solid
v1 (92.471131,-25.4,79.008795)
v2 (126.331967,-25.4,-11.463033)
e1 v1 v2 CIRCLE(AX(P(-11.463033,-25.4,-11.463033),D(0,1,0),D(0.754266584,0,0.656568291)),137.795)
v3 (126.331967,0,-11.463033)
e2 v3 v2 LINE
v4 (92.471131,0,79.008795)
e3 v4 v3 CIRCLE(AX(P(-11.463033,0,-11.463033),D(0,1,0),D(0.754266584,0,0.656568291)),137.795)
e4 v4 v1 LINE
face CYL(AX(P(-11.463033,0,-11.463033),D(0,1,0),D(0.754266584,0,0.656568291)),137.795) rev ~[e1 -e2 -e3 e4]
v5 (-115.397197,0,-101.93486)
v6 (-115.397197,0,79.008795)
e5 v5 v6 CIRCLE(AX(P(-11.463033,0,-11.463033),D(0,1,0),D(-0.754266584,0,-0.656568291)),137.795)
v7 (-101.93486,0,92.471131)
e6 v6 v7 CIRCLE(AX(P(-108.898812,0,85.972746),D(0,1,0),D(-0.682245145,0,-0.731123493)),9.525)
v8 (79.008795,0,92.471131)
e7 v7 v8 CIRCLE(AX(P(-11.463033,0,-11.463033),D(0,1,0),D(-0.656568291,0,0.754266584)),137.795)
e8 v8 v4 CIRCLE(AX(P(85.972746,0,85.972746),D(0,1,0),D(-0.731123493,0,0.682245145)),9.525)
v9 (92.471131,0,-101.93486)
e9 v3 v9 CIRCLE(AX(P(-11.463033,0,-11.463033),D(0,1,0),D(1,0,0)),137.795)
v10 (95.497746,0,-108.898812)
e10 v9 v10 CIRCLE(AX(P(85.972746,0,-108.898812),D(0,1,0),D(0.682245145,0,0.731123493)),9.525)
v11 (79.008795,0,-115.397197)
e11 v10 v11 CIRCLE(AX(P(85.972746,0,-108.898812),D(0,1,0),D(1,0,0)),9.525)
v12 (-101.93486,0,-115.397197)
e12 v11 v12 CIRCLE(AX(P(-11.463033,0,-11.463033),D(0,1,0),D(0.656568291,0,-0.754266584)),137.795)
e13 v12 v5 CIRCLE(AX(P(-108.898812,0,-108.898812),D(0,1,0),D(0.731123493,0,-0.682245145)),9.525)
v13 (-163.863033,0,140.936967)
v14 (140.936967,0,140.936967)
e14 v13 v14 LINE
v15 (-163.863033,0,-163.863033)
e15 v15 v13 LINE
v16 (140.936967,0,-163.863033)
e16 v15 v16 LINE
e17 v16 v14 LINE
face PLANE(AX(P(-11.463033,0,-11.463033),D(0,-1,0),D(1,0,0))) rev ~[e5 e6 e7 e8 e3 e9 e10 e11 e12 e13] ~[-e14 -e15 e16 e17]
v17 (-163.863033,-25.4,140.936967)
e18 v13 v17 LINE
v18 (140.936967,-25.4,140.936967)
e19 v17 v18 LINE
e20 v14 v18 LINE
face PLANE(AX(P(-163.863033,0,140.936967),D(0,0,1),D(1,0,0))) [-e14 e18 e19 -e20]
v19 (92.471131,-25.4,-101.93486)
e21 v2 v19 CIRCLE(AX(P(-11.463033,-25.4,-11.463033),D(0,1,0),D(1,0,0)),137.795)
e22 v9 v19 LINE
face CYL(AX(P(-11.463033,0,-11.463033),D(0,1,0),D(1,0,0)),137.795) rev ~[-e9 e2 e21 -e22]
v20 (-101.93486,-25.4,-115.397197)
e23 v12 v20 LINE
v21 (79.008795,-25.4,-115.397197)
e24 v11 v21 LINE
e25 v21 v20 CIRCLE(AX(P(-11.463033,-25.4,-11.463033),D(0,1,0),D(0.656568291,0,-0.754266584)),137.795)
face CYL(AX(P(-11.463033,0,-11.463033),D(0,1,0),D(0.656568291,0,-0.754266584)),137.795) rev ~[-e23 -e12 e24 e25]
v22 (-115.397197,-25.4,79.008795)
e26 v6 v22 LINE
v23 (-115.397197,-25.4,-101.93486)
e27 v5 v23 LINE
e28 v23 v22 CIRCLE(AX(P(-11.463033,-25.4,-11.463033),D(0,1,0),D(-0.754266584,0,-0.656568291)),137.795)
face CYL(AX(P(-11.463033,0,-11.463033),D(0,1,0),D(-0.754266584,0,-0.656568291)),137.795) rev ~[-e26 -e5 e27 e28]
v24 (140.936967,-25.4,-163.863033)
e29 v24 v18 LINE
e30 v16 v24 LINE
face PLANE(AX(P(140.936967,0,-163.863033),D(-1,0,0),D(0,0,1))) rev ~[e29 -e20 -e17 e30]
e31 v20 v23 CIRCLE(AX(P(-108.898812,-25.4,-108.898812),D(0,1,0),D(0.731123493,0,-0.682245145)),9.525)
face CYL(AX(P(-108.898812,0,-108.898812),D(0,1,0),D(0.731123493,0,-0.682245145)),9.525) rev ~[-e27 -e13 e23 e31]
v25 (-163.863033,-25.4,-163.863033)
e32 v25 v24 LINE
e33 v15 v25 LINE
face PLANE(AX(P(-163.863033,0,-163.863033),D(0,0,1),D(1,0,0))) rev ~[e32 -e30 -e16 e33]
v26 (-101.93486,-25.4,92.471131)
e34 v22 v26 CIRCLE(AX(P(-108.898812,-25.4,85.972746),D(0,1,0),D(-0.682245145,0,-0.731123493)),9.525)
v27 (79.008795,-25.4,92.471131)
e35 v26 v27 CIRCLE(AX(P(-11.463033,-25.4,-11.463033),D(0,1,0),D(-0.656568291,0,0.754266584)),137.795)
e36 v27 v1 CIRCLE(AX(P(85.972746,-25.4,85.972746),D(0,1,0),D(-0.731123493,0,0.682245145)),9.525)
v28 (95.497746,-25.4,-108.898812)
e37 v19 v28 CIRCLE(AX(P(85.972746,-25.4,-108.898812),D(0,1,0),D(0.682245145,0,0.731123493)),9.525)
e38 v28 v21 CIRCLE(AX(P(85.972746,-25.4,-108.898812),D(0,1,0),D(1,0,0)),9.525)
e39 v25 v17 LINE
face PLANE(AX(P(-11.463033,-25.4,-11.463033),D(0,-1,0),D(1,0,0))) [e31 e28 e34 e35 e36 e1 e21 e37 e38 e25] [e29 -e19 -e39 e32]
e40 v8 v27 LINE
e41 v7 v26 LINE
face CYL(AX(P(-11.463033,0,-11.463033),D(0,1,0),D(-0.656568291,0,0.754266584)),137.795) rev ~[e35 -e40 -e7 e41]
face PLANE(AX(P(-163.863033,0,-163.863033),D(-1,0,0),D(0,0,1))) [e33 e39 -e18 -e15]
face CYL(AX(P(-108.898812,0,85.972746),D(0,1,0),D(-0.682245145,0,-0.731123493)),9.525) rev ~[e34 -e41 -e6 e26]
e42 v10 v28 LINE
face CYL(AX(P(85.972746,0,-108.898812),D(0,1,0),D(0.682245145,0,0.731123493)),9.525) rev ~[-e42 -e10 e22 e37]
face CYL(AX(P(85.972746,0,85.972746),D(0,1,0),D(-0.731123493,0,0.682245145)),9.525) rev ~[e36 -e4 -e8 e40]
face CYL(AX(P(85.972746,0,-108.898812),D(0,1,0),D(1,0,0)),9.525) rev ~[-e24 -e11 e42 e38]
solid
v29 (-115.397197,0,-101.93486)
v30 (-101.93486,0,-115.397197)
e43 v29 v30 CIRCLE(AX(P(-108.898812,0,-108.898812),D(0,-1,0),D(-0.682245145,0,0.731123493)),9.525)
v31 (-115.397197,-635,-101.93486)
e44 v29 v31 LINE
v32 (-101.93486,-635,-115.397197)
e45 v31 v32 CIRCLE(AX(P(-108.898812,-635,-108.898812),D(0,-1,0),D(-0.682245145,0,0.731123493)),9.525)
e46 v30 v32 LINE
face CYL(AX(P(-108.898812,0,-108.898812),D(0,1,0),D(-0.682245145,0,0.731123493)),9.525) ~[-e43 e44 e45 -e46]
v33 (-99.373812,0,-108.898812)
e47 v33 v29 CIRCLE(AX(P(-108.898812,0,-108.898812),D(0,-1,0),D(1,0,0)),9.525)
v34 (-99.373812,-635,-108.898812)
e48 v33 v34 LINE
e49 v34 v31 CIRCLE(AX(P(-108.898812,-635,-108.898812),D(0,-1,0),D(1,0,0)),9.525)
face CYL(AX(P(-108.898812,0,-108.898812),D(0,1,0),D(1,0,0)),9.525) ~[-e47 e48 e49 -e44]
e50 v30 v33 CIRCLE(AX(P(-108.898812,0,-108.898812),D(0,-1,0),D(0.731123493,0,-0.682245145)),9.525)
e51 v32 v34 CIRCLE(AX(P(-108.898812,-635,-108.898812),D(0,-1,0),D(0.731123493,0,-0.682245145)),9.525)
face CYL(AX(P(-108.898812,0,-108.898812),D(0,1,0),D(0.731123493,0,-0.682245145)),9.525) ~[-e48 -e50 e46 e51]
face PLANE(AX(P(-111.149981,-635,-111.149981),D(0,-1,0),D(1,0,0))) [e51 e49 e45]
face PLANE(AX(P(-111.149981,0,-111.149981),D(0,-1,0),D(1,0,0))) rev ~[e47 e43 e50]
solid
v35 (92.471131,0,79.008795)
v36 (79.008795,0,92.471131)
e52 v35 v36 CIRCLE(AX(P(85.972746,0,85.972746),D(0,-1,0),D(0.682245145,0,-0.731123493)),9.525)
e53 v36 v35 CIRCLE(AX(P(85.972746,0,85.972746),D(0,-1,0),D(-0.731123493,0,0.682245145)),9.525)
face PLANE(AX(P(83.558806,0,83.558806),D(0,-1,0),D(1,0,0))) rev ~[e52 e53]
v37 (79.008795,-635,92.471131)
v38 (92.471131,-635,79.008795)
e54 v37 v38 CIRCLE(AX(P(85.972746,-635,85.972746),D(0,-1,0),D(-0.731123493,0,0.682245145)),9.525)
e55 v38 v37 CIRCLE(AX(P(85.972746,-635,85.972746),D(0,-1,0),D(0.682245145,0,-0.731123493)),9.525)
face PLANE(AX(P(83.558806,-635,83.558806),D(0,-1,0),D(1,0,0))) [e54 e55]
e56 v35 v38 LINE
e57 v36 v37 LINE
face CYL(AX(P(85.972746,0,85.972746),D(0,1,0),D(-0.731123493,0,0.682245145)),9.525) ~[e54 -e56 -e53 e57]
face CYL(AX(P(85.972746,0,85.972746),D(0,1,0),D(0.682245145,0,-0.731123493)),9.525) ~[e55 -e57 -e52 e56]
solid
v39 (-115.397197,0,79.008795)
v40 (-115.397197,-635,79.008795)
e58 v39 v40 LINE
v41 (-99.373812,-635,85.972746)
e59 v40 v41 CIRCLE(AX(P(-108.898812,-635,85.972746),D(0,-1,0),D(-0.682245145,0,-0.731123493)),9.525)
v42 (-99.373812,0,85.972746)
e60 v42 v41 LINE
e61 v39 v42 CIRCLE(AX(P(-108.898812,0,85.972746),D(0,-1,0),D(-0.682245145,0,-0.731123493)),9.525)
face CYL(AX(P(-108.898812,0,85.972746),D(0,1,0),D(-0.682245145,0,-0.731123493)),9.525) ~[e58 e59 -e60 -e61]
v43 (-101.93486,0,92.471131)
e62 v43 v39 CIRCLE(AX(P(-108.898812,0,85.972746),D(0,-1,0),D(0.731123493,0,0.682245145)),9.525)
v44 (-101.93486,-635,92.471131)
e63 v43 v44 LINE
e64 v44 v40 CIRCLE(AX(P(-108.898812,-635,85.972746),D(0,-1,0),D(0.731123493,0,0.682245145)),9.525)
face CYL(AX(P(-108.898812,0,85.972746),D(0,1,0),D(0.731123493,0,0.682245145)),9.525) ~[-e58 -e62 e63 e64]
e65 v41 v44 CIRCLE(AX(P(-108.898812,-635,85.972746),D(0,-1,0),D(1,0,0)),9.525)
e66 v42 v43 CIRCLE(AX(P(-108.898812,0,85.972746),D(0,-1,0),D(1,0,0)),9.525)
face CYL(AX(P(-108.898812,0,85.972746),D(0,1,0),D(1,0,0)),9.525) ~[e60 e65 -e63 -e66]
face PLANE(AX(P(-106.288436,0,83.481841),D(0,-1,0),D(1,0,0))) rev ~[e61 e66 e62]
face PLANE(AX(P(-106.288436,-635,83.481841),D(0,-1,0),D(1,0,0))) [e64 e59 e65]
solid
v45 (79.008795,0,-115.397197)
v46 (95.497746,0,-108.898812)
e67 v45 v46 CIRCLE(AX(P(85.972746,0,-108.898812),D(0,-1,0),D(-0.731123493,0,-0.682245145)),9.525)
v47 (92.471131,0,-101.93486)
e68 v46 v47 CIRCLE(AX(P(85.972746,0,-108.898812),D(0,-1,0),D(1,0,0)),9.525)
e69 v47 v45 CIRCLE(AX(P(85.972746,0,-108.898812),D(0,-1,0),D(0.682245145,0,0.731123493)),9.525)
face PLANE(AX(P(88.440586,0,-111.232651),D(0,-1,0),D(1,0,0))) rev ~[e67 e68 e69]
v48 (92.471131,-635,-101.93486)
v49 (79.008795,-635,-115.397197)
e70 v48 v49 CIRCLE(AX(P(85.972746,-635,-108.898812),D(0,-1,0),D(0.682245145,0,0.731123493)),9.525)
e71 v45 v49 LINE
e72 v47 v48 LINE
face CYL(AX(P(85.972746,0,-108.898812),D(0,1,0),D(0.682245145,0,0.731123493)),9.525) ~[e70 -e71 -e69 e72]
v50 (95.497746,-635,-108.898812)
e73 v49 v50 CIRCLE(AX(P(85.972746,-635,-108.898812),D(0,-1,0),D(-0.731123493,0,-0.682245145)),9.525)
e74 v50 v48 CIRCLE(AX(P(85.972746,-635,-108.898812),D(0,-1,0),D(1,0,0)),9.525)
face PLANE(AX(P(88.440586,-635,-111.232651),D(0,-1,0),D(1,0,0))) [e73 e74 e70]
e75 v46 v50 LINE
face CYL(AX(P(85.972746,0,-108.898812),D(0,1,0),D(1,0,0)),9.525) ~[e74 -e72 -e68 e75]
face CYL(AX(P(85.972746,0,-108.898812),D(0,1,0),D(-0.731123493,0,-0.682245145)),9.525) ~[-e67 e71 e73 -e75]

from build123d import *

# Parameters (mm, degrees)
F1_DEPTH = 635
F0_W     = 304.8
F0_H     = 304.8
F2_DEPTH = 25.4


with BuildPart() as f1:
    # F0 (on Front) → F1 (new body)
    with BuildSketch(Plane.XZ):
        with BuildLine():
            ThreePointArc((79.0087948248, 92.4711311021), (79.2375540094, 79.2375540094), (92.4711311021, 79.0087948248))
            ThreePointArc((92.4711311021, 79.0087948248), (85.9727461002, 85.9727461002), (79.0087948248, 92.4711311021))
        make_face()
        with BuildLine():
            ThreePointArc((79.0087948248, 92.4711311021), (85.9727461002, 85.9727461002), (92.4711311021, 79.0087948248))
            ThreePointArc((92.4711311021, 79.0087948248), (94.708384089, 82.1761352526), (95.4977461002, 85.9727461002))
            ThreePointArc((95.4977461002, 85.9727461002), (89.4651656842, 94.834384236), (79.0087948248, 92.4711311021))
        make_face()
    extrude(amount=F1_DEPTH)


with BuildPart() as f1b:
    # F0 (on Front) → F1, piece 2 (new body)
    with BuildSketch(Plane.XZ):
        with BuildLine():
            ThreePointArc((95.4977461002, -108.898811727), (94.708384089, -105.1022008793), (92.4711311021, -101.9348604515))
            ThreePointArc((92.4711311021, -101.9348604515), (85.9727461002, -108.898811727), (79.0087948248, -115.3971967289))
            ThreePointArc((79.0087948248, -115.3971967289), (89.4651656842, -117.7604498627), (95.4977461002, -108.898811727))
        make_face()
        with BuildLine():
            ThreePointArc((79.0087948248, -115.3971967289), (85.9727461002, -108.898811727), (92.4711311021, -101.9348604515))
            ThreePointArc((92.4711311021, -101.9348604515), (79.2375540094, -102.1636196362), (79.0087948248, -115.3971967289))
        make_face()
    extrude(amount=F1_DEPTH)


with BuildPart() as f1c:
    # F0 (on Front) → F1, piece 3 (new body)
    with BuildSketch(Plane.XZ):
        with BuildLine():
            ThreePointArc((-99.373811727, 85.9727461002), (-100.0371735912, 89.4651656842), (-101.9348604515, 92.4711311021))
            ThreePointArc((-101.9348604515, 92.4711311021), (-108.898811727, 85.9727461002), (-115.3971967289, 79.0087948248))
            ThreePointArc((-115.3971967289, 79.0087948248), (-105.1022008793, 77.2371081114), (-99.373811727, 85.9727461002))
        make_face()
        with BuildLine():
            ThreePointArc((-115.3971967289, 79.0087948248), (-108.898811727, 85.9727461002), (-101.9348604515, 92.4711311021))
            ThreePointArc((-101.9348604515, 92.4711311021), (-115.6340038178, 92.707938191), (-115.3971967289, 79.0087948248))
        make_face()
    extrude(amount=F1_DEPTH)


with BuildPart() as f1d:
    # F0 (on Front) → F1, piece 4 (new body)
    with BuildSketch(Plane.XZ):
        with BuildLine():
            ThreePointArc((-115.3971967289, -101.9348604515), (-115.6340038178, -115.6340038178), (-101.9348604515, -115.3971967289))
            ThreePointArc((-101.9348604515, -115.3971967289), (-108.898811727, -108.898811727), (-115.3971967289, -101.9348604515))
        make_face()
        with BuildLine():
            ThreePointArc((-115.3971967289, -101.9348604515), (-108.898811727, -108.898811727), (-101.9348604515, -115.3971967289))
            ThreePointArc((-101.9348604515, -115.3971967289), (-100.0371735912, -112.391231311), (-99.373811727, -108.898811727))
            ThreePointArc((-99.373811727, -108.898811727), (-105.1022008793, -100.1631737382), (-115.3971967289, -101.9348604515))
        make_face()
    extrude(amount=F1_DEPTH)


with BuildPart() as f2:
    # F0 (on Front) → F2 (new body)
    with BuildSketch(Plane.XZ):
        with Locations((-11.4630328134, -11.4630328134)):
            Rectangle(F0_W, F0_H)
        with BuildLine():
            ThreePointArc((92.4711311021, 79.0087948248), (117.5894180385, 36.8373497331), (126.3319671866, -11.4630328134))
            ThreePointArc((126.3319671866, -11.4630328134), (117.5894180385, -59.7634153598), (92.4711311021, -101.9348604515))
            ThreePointArc((92.4711311021, -101.9348604515), (94.708384089, -105.1022008793), (95.4977461002, -108.898811727))
            ThreePointArc((95.4977461002, -108.898811727), (89.4651656842, -117.7604498627), (79.0087948248, -115.3971967289))
            ThreePointArc((79.0087948248, -115.3971967289), (-11.4630328134, -149.2580328134), (-101.9348604515, -115.3971967289))
            ThreePointArc((-101.9348604515, -115.3971967289), (-115.6340038178, -115.6340038178), (-115.3971967289, -101.9348604515))
            ThreePointArc((-115.3971967289, -101.9348604515), (-149.2580328134, -11.4630328134), (-115.3971967289, 79.0087948248))
            ThreePointArc((-115.3971967289, 79.0087948248), (-115.6340038178, 92.707938191), (-101.9348604515, 92.4711311021))
            ThreePointArc((-101.9348604515, 92.4711311021), (-11.4630328134, 126.3319671866), (79.0087948248, 92.4711311021))
            ThreePointArc((79.0087948248, 92.4711311021), (89.4651656842, 94.834384236), (95.4977461002, 85.9727461002))
            ThreePointArc((95.4977461002, 85.9727461002), (94.708384089, 82.1761352526), (92.4711311021, 79.0087948248))
        make_face(mode=Mode.SUBTRACT)
    extrude(amount=F2_DEPTH)


solid = Compound([f1.part, f1b.part, f1c.part, f1d.part, f2.part])
